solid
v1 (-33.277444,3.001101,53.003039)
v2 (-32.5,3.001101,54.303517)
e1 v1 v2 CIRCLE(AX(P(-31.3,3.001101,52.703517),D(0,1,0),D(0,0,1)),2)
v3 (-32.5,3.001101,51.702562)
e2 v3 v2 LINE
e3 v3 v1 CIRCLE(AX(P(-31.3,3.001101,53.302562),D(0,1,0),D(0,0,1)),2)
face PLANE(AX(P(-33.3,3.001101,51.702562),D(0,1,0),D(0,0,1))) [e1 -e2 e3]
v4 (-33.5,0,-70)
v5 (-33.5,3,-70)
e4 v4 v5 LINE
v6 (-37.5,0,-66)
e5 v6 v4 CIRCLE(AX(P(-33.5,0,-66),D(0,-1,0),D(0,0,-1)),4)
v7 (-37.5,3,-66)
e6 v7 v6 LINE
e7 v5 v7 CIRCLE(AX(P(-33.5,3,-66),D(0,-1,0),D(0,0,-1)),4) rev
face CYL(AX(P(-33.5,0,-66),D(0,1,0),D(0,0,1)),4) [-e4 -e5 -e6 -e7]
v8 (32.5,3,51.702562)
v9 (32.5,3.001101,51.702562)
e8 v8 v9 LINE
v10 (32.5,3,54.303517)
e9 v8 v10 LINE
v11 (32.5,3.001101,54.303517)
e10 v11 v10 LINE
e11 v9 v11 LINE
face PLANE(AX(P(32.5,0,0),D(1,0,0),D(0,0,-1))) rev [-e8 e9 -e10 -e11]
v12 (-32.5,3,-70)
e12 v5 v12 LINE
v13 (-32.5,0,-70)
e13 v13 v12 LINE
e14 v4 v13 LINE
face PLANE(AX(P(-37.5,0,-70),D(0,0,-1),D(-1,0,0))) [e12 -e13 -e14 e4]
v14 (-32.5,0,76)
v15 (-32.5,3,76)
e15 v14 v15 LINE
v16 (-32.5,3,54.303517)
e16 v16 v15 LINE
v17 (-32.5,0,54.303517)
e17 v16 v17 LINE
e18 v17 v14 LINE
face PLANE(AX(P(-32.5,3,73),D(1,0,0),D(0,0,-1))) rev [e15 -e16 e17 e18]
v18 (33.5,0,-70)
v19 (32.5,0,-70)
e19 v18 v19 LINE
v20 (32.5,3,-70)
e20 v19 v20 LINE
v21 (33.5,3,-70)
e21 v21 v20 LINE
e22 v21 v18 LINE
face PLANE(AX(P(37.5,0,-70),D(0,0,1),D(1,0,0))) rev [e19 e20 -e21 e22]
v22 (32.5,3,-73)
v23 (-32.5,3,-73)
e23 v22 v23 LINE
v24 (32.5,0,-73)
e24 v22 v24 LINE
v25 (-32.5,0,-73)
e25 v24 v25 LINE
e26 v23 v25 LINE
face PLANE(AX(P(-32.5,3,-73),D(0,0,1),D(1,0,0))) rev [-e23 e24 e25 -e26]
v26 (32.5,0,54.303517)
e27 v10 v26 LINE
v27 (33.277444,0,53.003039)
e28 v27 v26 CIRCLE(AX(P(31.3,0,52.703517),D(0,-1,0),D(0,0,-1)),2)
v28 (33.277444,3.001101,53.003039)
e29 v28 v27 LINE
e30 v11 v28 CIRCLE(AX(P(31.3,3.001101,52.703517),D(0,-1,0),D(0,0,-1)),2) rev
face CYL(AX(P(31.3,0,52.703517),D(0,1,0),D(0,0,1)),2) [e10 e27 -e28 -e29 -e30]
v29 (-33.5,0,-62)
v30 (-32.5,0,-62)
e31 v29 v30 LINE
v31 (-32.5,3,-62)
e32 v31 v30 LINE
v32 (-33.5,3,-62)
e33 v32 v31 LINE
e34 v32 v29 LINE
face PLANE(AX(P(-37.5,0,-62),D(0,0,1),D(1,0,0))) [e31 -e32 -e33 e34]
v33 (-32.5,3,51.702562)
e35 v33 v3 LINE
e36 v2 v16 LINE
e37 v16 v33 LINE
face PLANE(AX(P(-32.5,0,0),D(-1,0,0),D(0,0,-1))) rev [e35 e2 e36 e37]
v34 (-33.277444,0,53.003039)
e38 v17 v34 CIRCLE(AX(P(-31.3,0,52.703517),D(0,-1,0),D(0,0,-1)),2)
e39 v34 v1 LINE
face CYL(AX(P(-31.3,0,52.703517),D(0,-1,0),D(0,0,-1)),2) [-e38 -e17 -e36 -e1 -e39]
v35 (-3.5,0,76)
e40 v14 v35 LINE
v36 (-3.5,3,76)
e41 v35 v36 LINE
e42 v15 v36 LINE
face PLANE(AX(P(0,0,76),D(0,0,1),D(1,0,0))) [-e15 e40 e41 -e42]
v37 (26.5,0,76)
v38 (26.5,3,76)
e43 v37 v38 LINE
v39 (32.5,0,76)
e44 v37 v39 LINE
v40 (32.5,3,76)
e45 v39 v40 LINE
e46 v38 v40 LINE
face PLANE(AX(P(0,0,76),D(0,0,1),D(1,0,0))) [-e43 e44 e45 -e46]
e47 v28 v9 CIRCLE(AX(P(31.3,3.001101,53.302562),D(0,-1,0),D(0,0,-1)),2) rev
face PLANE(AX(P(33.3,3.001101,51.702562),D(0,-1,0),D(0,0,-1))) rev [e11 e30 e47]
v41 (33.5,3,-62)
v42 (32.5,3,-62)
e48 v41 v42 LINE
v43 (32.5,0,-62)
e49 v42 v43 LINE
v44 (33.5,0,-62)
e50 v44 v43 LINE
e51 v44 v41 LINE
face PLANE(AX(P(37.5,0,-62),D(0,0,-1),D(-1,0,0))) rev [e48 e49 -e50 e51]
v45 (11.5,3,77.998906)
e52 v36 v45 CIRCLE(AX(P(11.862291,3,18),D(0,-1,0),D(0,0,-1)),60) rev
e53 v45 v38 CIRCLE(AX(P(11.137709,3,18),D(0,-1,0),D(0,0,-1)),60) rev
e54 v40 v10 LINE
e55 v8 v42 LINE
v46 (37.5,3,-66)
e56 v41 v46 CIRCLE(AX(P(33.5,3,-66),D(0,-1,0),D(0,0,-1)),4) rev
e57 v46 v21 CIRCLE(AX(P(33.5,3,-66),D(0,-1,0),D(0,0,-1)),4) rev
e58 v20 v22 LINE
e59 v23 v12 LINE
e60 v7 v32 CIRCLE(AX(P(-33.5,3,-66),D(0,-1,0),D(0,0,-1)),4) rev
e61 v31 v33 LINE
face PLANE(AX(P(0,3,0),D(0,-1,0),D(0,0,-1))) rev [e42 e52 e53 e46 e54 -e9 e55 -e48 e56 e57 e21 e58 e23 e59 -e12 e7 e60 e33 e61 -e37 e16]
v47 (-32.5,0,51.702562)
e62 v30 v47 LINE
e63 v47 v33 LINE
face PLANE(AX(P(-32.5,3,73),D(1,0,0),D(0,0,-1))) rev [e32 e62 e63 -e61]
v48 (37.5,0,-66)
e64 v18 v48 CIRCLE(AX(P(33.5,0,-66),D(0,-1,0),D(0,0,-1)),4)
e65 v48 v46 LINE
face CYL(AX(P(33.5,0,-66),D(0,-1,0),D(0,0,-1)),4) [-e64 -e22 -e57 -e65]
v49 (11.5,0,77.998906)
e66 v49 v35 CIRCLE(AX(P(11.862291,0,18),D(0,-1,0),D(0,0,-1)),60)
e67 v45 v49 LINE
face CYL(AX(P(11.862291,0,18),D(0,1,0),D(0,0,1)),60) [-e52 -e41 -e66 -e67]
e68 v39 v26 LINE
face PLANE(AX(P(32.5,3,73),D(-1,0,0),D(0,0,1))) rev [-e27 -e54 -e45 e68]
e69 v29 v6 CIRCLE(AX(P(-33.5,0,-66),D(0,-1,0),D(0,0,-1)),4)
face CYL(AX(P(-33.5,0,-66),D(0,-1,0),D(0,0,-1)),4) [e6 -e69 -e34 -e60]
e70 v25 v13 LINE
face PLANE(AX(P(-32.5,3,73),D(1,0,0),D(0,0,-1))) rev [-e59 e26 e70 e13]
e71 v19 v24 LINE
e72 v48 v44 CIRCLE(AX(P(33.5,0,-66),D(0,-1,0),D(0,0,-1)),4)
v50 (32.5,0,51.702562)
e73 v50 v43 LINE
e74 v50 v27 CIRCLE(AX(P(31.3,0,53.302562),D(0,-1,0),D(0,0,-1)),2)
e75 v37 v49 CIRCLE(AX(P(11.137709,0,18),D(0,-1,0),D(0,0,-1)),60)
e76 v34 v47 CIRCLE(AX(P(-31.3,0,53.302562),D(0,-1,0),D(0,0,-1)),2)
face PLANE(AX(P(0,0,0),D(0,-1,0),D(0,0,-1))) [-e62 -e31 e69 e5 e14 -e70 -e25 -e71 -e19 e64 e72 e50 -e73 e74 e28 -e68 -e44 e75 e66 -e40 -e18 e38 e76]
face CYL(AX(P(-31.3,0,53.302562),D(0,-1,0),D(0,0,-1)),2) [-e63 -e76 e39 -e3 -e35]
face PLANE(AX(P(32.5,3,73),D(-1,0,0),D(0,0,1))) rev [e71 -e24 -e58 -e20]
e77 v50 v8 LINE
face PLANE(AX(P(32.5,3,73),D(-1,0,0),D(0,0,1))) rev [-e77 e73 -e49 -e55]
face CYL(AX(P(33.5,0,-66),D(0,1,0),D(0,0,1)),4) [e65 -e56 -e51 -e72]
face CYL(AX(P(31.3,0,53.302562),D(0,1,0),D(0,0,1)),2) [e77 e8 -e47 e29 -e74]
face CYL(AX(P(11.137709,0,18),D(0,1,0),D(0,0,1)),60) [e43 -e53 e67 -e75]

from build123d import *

# Parameters (mm, degrees)
CROQUIS1_W               = 65
CROQUIS1_H               = 146
SALIENTE_EXTRUIR1_DEPTH  = 3
CROQUIS2_W               = 8
CROQUIS2_H               = 3
SALIENTE_EXTRUIR2_DEPTH  = 5
REDONDEO1_R              = 4
REDONDEO1_OF_SIMETR_A1_R = 4
CROQUIS3_W               = 2.60095456
CROQUIS3_H               = 3.001101416
SALIENTE_EXTRUIR3_DEPTH  = 0.8
REDONDEO2_R              = 2
REDONDEO2_OF_SIMETR_A5_R = 2
CROQUIS4_W               = 65
CROQUIS4_H               = 3
CROQUIS4_W_2             = 30
CROQUIS4_H_2             = 2
SALIENTE_EXTRUIR4_DEPTH  = 3
REDONDEO3_R              = 60


# Some blends are built 0.0001 mm under size
with BuildPart() as part:
    # Croquis1 → Saliente-Extruir1 (new body)
    with BuildSketch(Plane(origin=(0, 0, 0), x_dir=(1, 0, 0), z_dir=(0, 1, 0))):
        Rectangle(CROQUIS1_W, CROQUIS1_H)
    extrude(amount=SALIENTE_EXTRUIR1_DEPTH)

    # Croquis2 → Saliente-Extruir2 (add)
    with BuildSketch(Plane(origin=(32.5, 0, 0), x_dir=(0, 0, -1), z_dir=(1, 0, 0))):
        with Locations((66, 1.5)):
            Rectangle(CROQUIS2_W, CROQUIS2_H)
    saliente_extruir2 = extrude(amount=SALIENTE_EXTRUIR2_DEPTH)

    # Redondeo1
    redondeo1_edges = [part.edges().sort_by_distance(p)[0] for p in [
        (37.5, 1.5, -62),
        (37.5, 1.5, -70),
    ]]
    fillet(redondeo1_edges, radius=REDONDEO1_R - 0.0001)  # a hair under: the kernel refuses the full size

    # Simetría1: Saliente-Extruir2 across plane
    add(saliente_extruir2.mirror(Plane(origin=(0, 0, 0), x_dir=(0, 0, 1), z_dir=(1, 0, 0))))

    # Redondeo1 of Simetría1
    redondeo1_of_simetr_a1_edges = [part.edges().sort_by_distance(p)[0] for p in [
        (-37.5, 1.5, -62),
        (-37.5, 1.5, -70),
    ]]
    fillet(redondeo1_of_simetr_a1_edges, radius=REDONDEO1_OF_SIMETR_A1_R - 0.0001)  # a hair under: the kernel refuses the full size

    # Croquis3 → Saliente-Extruir3 (add)
    with BuildSketch(Plane(origin=(32.5, 0, 0), x_dir=(0, 0, -1), z_dir=(1, 0, 0))):
        with Locations((-53.003039433, 1.500550708)):
            Rectangle(CROQUIS3_W, CROQUIS3_H)
    saliente_extruir3 = extrude(amount=SALIENTE_EXTRUIR3_DEPTH)

    # Redondeo2
    # the kernel refuses this fillet: 2 mm, written as the material it takes off along each edge
    with BuildSketch(Plane(origin=(33.3, 7.001101416, 51.702562153), x_dir=(-1, 0, 0), z_dir=(0, -1, 0)), Plane(origin=(33.3, -4, 54.303516713), x_dir=(-1, 0, 0), z_dir=(0, 1, 0))) as redondeo2_piece_1:
        with BuildLine():
            CenterArc((2, -1.6), REDONDEO2_R, 126.869897646, 53.130102354)
            Line((0, -1.6), (-0.04, -1.6))
            Line((-0.04, -1.6), (-0.04, 0))
            Line((-0.04, 0), (0, 0.04))
            ThreePointArc((0, 0.04), (0.4, 0.04), (0.776, 0.032))
            Line((0.776, 0.032), (0.8, 0))
        make_face()
    extrude(amount=11.001101416, mode=Mode.SUBTRACT)

    # Simetría5: Saliente-Extruir3 across plane
    add(saliente_extruir3.mirror(Plane(origin=(0, 0, 0), x_dir=(0, 0, 1), z_dir=(1, 0, 0))))

    # Redondeo2 of Simetría5
    # the kernel refuses this fillet: 2 mm, written as the material it takes off along each edge
    with BuildSketch(Plane(origin=(-33.3, 7.001101416, 51.702562153), x_dir=(1, 0, 0), z_dir=(0, -1, 0)), Plane(origin=(-33.3, -4, 54.303516713), x_dir=(1, 0, 0), z_dir=(0, 1, 0))) as redondeo2_of_simetr_a5_piece_1:
        with BuildLine():
            CenterArc((2, 1.6), REDONDEO2_OF_SIMETR_A5_R, 180, 53.130102354)
            Line((0, 1.6), (-0.04, 1.6))
            Line((-0.04, 1.6), (-0.04, 0))
            Line((-0.04, 0), (0, -0.04))
            ThreePointArc((0, -0.04), (0.4, -0.04), (0.776, -0.032))
            Line((0.776, -0.032), (0.8, 0))
        make_face()
    extrude(amount=11.001101416, mode=Mode.SUBTRACT)

    # Croquis4 → Saliente-Extruir4 (add)
    with BuildSketch(Plane(origin=(0, 3, 0), x_dir=(1, 0, 0), z_dir=(0, 1, 0))):
        with Locations((0, -74.5)):
            Rectangle(CROQUIS4_W, CROQUIS4_H)
        with Locations((11.5, -77)):
            Rectangle(CROQUIS4_W_2, CROQUIS4_H_2)
    extrude(amount=-SALIENTE_EXTRUIR4_DEPTH)

    # Redondeo3
    # the kernel refuses this fillet: 60 mm, written as the material it takes off along each edge
    with BuildSketch(Plane(origin=(26.5, 41.405728739, 78), x_dir=(0, 0, -1), z_dir=(0, -1, 0))) as redondeo3_piece_1:
        with BuildLine():
            CenterArc((60, -15.362291496), REDONDEO3_R, 165.164888418, 14.835111582)
            Line((0, -15.362291496), (0, 0))
            Line((0, 0), (2, 0))
        make_face()
    extrude(amount=79.811457479, mode=Mode.SUBTRACT)
    with BuildSketch(Plane(origin=(-3.5, 41.405728739, 78), x_dir=(1, 0, 0), z_dir=(0, -1, 0))) as redondeo3_piece_2:
        with BuildLine():
            CenterArc((15.362291496, -60), REDONDEO3_R, 90, 14.835111582)
            Line((0, -2), (0, 0))
            Line((0, 0), (15.362291496, 0))
        make_face()
    extrude(amount=79.811457479, mode=Mode.SUBTRACT)


solid = part.part
